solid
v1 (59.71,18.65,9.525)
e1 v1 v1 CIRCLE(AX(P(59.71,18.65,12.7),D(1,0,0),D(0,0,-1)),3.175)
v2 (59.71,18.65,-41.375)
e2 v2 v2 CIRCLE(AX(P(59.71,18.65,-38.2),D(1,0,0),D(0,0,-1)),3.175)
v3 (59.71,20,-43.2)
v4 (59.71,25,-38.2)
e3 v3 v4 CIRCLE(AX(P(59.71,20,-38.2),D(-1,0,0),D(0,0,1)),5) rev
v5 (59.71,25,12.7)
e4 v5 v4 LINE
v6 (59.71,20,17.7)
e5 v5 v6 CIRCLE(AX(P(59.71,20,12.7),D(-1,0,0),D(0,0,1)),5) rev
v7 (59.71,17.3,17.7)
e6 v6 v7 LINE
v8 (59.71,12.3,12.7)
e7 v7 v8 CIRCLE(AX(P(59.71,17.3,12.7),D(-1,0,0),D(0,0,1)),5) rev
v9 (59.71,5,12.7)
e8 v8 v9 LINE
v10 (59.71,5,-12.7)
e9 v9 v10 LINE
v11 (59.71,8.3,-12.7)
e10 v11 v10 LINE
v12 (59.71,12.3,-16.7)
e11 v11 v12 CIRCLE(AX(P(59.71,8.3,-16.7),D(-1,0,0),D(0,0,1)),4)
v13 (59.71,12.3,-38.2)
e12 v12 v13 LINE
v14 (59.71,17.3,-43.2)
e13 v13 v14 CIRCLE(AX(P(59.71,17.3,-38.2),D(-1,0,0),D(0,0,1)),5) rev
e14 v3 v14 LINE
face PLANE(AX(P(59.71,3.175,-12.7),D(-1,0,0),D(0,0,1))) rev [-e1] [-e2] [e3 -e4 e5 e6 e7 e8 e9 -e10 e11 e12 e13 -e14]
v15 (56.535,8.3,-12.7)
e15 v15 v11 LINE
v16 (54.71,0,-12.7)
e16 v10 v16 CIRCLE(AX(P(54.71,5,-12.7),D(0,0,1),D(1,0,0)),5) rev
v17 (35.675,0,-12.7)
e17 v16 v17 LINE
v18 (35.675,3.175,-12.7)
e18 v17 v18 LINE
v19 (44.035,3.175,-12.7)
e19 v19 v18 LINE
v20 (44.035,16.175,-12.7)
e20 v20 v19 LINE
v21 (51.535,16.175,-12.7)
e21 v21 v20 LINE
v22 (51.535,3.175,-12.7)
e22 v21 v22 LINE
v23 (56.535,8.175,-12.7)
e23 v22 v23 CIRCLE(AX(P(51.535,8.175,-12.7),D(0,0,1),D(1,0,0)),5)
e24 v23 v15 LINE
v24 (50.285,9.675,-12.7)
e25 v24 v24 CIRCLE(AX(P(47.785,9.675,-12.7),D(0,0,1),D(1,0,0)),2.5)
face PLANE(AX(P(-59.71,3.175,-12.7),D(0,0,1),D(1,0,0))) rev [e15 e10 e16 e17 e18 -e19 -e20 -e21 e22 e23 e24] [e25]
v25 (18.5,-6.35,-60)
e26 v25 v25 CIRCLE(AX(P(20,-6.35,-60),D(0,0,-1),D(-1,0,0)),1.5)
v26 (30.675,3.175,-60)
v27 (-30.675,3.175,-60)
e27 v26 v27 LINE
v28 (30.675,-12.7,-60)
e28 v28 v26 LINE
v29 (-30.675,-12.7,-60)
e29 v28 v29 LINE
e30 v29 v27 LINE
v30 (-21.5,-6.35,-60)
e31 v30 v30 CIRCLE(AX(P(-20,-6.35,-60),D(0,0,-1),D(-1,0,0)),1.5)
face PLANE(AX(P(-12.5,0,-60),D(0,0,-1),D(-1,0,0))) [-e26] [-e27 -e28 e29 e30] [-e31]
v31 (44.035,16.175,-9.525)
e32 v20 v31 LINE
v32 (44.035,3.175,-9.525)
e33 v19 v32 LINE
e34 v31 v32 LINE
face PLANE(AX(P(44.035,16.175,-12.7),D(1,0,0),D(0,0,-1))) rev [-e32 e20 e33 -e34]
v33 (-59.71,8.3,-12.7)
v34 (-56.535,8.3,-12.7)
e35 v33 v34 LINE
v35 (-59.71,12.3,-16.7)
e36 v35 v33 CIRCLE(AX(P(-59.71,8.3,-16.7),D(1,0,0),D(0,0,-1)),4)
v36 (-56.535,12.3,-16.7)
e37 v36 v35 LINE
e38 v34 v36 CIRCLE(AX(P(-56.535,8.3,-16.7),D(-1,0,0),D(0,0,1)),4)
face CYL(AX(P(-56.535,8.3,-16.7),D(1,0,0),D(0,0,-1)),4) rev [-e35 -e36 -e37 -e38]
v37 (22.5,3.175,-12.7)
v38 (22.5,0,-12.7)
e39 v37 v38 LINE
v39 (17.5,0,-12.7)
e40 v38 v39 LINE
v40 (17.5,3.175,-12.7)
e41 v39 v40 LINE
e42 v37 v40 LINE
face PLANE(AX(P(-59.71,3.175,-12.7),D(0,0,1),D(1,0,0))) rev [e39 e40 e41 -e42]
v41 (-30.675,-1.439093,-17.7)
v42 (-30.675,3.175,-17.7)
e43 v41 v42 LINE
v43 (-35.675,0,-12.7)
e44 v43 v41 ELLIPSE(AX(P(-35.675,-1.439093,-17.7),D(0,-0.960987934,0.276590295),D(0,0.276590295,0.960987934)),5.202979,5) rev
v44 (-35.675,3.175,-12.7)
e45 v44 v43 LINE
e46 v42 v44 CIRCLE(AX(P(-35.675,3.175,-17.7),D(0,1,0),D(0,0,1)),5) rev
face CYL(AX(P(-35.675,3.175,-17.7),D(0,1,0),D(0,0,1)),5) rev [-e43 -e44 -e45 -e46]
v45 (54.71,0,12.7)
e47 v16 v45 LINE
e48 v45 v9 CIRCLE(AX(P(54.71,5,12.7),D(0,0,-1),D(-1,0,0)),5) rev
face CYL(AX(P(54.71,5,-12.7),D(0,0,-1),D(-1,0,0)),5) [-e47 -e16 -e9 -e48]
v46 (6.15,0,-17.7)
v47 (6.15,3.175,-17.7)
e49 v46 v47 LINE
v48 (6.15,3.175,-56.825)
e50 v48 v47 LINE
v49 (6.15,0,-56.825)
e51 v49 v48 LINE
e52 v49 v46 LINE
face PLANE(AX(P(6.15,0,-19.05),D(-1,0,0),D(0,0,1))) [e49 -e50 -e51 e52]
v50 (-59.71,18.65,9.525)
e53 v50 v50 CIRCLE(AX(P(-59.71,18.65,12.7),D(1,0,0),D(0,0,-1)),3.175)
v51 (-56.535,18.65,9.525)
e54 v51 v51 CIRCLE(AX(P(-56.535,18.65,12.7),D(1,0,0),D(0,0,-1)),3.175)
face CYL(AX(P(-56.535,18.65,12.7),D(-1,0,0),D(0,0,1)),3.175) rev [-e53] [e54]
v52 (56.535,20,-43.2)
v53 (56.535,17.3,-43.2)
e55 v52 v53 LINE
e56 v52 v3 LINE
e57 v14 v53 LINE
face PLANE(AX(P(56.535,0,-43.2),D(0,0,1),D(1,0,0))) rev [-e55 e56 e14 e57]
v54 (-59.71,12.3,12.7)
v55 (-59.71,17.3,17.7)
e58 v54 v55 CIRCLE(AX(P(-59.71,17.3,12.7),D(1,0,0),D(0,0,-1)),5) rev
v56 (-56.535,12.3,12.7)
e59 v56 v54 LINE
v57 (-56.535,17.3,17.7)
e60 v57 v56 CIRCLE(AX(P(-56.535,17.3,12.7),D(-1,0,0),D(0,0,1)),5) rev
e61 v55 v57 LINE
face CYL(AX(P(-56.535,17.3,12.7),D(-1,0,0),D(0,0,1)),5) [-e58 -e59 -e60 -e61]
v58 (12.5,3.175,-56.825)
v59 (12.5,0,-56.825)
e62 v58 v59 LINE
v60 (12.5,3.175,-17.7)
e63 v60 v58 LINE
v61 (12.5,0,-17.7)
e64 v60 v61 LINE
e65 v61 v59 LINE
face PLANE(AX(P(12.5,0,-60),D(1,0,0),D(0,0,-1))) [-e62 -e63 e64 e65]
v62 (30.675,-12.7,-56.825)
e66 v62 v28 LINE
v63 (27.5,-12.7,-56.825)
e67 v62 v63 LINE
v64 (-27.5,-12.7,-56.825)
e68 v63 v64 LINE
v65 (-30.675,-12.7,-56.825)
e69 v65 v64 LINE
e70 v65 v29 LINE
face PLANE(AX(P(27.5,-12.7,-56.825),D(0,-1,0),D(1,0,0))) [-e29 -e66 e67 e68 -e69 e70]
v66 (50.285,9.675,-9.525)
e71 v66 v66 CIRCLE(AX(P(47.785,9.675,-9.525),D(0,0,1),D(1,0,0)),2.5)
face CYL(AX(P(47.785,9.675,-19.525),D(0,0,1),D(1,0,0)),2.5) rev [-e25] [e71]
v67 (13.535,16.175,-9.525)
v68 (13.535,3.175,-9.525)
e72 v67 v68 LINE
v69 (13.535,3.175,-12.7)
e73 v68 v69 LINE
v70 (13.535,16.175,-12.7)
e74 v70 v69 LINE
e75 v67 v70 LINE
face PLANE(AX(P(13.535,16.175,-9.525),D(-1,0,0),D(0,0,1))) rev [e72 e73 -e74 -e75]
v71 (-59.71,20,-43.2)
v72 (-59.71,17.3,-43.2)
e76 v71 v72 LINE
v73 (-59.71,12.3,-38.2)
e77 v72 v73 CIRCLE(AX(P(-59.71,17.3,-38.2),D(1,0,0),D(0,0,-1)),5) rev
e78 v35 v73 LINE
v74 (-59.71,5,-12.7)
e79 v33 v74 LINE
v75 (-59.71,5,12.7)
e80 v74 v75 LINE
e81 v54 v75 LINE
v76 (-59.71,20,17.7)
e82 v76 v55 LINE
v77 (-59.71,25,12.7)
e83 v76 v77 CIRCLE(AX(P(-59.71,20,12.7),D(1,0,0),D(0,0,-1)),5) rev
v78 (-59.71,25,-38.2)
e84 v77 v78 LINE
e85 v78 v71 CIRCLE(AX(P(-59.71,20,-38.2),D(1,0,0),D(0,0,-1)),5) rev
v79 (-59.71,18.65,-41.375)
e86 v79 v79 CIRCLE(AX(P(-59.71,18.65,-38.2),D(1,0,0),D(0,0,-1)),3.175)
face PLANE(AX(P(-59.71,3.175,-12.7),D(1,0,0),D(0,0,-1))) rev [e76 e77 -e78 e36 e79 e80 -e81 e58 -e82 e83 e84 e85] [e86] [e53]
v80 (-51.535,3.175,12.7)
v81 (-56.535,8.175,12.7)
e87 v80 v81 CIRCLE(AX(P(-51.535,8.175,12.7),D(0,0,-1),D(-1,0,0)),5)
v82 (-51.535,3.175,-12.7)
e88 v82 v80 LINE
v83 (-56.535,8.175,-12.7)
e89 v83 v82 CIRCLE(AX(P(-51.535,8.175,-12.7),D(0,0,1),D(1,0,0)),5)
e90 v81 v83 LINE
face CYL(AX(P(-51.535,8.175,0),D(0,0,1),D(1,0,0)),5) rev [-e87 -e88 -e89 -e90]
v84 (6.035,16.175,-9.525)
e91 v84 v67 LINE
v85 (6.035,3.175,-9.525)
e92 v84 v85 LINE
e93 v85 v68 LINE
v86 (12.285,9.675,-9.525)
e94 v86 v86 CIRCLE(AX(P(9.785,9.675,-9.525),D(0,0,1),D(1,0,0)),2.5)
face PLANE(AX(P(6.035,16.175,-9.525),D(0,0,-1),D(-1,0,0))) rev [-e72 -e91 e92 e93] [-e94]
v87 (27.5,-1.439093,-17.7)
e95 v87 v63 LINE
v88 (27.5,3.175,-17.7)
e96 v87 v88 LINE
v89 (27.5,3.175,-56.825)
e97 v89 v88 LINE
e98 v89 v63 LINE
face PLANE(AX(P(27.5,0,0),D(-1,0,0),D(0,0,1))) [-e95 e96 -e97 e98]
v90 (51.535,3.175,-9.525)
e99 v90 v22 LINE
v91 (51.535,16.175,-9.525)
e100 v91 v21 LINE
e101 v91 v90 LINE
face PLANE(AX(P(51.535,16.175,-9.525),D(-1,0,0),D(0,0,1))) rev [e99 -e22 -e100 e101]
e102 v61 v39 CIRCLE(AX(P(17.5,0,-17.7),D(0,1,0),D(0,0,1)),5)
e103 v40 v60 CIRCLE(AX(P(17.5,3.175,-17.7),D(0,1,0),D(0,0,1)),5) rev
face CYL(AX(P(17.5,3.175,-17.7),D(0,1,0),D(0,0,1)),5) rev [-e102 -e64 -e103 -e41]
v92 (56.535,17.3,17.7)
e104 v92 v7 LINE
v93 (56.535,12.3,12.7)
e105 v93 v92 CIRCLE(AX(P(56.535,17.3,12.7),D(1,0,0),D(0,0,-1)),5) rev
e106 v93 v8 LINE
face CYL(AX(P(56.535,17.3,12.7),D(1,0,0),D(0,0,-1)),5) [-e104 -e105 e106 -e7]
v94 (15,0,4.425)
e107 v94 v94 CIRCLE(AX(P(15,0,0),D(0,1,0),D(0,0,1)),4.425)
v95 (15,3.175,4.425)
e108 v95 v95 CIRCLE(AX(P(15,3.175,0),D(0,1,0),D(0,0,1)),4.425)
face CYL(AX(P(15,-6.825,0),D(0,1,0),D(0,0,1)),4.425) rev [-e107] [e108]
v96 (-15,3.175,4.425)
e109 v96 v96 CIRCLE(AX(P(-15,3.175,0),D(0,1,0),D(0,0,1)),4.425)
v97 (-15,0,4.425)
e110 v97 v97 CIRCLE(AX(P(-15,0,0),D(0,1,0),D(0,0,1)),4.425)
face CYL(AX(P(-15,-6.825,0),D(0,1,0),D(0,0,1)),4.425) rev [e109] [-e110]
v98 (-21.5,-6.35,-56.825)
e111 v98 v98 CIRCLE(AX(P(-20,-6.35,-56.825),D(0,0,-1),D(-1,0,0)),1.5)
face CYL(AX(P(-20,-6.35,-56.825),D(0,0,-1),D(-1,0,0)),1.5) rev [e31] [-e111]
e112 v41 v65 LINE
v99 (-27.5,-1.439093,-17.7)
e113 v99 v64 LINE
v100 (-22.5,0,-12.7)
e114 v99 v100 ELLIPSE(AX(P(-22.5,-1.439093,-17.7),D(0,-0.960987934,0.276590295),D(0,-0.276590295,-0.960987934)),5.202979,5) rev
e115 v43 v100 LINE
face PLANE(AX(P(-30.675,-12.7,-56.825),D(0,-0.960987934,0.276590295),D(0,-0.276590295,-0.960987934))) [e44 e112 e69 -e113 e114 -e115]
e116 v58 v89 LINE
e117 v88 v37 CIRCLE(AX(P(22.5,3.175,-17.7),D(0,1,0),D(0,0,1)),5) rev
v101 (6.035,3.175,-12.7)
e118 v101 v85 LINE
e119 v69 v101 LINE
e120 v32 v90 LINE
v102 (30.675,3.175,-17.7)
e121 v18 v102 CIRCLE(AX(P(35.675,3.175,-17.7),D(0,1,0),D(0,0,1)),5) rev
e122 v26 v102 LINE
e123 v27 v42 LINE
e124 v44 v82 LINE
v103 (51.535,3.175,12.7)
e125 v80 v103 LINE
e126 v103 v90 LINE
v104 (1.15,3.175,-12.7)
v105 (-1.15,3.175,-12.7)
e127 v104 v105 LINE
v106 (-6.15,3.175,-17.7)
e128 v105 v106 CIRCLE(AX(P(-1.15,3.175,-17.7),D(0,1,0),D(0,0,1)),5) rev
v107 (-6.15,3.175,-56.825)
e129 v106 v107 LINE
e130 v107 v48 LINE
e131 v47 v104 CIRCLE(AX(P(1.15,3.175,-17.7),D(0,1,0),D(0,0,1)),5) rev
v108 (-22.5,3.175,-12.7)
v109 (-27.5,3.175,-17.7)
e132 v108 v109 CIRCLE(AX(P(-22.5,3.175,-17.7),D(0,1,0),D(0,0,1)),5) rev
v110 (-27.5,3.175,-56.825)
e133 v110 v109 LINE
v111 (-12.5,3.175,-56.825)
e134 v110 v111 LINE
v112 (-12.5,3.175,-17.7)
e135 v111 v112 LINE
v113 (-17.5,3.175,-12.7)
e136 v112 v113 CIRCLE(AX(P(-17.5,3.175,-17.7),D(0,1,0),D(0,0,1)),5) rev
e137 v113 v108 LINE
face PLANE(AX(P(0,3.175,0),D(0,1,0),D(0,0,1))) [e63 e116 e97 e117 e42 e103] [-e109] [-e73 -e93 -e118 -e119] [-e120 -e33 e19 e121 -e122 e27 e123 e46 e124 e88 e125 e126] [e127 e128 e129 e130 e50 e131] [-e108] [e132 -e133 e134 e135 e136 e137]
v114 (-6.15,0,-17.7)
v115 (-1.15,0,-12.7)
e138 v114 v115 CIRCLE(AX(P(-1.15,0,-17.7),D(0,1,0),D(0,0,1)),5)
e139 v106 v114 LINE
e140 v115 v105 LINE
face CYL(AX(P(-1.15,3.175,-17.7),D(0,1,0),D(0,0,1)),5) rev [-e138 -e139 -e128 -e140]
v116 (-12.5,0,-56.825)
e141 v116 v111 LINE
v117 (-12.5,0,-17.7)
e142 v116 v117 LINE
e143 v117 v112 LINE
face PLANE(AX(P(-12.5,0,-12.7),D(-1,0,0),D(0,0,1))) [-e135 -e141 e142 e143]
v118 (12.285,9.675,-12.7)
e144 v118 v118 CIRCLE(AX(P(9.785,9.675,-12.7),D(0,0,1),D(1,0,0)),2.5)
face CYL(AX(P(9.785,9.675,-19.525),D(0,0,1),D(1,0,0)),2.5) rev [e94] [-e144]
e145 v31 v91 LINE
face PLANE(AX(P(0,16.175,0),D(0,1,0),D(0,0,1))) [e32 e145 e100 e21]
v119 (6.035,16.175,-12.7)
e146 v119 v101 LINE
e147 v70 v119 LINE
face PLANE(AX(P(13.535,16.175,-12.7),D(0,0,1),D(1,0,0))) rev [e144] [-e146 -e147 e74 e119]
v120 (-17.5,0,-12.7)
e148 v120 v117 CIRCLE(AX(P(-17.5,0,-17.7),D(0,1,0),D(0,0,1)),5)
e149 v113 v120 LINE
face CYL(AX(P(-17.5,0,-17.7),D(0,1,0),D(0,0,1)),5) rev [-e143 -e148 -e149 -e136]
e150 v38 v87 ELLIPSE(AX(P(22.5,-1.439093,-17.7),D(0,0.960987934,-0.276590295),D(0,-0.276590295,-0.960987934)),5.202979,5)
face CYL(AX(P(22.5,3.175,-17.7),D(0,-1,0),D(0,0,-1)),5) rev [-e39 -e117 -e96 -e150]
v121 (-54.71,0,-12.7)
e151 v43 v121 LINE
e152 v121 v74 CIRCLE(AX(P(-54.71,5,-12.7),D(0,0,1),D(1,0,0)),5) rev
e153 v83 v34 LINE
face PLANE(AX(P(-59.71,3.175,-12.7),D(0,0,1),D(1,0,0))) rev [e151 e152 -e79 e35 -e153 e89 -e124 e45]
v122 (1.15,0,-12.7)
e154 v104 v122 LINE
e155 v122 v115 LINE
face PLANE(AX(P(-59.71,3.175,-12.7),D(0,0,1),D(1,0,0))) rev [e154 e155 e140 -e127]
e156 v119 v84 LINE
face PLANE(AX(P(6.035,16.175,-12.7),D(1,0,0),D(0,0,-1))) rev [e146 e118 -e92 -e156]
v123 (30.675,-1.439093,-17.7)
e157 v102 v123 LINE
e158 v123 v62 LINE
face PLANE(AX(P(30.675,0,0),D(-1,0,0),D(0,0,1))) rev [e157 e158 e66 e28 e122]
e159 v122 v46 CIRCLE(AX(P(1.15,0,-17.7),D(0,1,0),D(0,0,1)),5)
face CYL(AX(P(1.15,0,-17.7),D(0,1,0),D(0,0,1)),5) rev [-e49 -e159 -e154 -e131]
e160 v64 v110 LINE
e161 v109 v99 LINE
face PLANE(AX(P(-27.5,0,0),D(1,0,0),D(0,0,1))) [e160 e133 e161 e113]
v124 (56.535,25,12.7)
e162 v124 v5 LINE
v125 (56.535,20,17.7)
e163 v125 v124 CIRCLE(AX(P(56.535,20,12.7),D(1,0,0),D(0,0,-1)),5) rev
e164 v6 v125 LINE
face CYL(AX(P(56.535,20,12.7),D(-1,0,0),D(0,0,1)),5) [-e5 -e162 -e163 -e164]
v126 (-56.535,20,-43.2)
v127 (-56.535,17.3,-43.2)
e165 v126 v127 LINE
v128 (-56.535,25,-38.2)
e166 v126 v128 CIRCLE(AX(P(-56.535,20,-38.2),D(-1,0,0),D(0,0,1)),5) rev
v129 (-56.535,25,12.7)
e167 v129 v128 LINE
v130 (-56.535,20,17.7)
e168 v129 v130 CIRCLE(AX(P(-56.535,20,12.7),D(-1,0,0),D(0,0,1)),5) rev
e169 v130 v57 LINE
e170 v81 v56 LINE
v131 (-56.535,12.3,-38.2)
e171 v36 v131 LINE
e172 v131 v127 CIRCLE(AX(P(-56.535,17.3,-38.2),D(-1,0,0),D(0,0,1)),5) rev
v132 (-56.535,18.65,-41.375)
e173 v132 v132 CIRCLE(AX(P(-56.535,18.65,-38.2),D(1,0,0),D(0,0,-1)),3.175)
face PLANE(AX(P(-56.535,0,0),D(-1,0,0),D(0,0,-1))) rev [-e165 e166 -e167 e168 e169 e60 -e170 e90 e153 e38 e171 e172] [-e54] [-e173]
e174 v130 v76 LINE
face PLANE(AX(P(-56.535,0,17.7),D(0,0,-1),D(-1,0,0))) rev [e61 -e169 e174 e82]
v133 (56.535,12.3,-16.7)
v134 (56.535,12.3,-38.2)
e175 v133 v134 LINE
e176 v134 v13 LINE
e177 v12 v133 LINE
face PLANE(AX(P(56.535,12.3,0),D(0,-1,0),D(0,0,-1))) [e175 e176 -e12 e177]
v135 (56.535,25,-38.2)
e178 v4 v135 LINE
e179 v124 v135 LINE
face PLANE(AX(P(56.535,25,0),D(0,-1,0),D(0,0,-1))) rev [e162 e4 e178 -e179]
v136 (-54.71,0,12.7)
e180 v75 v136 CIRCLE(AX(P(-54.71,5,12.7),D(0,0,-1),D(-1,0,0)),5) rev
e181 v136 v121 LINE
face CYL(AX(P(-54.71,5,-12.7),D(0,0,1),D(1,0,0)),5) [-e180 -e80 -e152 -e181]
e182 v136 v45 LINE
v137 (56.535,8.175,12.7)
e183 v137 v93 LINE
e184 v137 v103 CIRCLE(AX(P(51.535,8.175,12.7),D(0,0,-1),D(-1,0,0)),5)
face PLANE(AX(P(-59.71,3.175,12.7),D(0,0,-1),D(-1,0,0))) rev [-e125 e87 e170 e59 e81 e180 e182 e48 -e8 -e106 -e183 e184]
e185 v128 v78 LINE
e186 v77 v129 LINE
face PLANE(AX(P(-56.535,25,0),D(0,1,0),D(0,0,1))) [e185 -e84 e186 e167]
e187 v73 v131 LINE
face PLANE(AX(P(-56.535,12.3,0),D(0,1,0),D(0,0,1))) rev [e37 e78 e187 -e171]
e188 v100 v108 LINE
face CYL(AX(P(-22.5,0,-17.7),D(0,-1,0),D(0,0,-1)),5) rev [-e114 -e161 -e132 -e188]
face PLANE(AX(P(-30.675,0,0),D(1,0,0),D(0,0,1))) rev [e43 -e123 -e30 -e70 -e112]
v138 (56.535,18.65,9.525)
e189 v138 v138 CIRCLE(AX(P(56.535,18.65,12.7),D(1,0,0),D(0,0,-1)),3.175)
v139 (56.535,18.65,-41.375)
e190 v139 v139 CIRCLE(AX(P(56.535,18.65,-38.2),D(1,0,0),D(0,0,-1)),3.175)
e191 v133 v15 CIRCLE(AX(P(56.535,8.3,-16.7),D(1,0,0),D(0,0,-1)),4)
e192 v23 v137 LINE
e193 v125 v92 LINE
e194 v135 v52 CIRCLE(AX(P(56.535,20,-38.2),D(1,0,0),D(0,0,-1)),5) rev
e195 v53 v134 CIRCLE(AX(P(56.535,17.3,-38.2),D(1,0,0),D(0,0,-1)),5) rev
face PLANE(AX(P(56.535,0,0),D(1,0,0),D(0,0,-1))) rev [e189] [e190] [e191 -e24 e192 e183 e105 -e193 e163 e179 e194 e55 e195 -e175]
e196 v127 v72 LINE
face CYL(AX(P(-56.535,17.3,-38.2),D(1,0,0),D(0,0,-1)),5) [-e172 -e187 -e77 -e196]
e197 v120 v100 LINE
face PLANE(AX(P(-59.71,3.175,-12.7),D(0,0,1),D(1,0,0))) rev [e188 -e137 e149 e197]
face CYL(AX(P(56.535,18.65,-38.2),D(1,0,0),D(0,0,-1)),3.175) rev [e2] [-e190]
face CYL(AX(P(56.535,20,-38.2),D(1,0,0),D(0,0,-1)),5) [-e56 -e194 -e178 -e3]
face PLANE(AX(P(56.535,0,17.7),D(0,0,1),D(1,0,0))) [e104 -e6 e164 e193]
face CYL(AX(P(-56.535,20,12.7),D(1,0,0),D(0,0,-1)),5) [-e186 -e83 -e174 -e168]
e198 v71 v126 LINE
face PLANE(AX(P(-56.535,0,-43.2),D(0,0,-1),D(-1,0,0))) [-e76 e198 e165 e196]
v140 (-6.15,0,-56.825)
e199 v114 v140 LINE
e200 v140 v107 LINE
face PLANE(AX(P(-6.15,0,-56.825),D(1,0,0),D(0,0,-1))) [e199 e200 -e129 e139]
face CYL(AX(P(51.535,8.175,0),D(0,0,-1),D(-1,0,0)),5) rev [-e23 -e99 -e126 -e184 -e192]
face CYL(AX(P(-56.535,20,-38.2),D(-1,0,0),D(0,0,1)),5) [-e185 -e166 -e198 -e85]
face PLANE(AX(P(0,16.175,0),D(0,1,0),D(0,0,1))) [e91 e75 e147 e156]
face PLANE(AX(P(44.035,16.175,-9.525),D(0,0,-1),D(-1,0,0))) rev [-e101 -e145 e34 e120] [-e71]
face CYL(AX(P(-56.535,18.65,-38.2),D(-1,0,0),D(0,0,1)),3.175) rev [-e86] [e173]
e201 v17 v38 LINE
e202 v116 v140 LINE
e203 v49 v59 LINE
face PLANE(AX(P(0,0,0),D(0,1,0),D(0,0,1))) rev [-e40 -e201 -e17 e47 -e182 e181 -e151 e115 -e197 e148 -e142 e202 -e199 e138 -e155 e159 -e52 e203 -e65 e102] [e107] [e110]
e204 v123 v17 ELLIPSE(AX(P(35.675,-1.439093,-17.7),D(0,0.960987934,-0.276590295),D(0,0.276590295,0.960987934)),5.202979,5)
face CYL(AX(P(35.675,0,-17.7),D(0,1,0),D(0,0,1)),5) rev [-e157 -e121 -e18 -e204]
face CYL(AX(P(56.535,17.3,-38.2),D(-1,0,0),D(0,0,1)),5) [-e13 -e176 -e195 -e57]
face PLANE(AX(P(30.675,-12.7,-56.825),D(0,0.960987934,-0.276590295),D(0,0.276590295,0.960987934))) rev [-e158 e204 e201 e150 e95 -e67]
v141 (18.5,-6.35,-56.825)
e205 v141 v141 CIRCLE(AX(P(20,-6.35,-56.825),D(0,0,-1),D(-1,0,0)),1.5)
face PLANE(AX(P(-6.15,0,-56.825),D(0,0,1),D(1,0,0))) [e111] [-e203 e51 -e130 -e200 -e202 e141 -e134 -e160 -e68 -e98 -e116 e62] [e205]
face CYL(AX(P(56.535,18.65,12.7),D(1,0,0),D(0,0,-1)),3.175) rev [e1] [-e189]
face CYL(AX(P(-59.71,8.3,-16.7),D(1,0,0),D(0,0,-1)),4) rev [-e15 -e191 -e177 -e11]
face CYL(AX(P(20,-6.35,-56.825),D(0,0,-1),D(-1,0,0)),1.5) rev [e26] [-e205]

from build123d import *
from OCP.BRepFilletAPI import BRepFilletAPI_MakeFillet

# Parameters (mm, degrees)
SKETCH1_W              = 119.42
SKETCH1_H              = 25.4
BOSS_EXTRUDE1_DEPTH    = 3.175
SKETCH2_R              = 3.175
SKETCH2_W              = 25.4
SKETCH2_H              = 3.175
BOSS_EXTRUDE3_DEPTH    = 3.175
FILLET2_R              = 5
FILLET2_R_2            = 4
FILLET2_OF_MIRROR3_R   = 5
FILLET2_OF_MIRROR3_R_2 = 4
FILLET3_R              = 5
SKETCH3_R              = 4.425
CUT_EXTRUDE1_DEPTH     = 10
BOSS_EXTRUDE4_DEPTH    = 3.175
SKETCH9_W              = 55
SKETCH9_H              = 15.875
SKETCH9_R              = 1.5
BOSS_EXTRUDE7_DEPTH    = 3.175
BOSS_EXTRUDE8_DEPTH    = 3.175
FILLET4_R              = 5
SKETCH11_W             = 7.5
SKETCH11_H             = 3.175
BOSS_EXTRUDE9_DEPTH    = 13
SKETCH12_R             = 2.5
CUT_EXTRUDE2_DEPTH     = 10


with BuildPart() as part:
    # Sketch1 → Boss-Extrude1 (new body)
    with BuildSketch(Plane(origin=(0, 0, 0), x_dir=(1, 0, 0), z_dir=(0, 1, 0))):
        Rectangle(SKETCH1_W, SKETCH1_H)
    extrude(amount=BOSS_EXTRUDE1_DEPTH)

    # Sketch2 → Boss-Extrude3 (add)
    # profile 1 of 2: a face of its own
    with BuildSketch(Plane(origin=(59.71, 0, 0), x_dir=(0, 0, -1), z_dir=(1, 0, 0))):
        Polygon((-12.7, 12.3), (-12.7, 3.175), (12.7, 3.175), (12.7, 12.3), (38.2, 12.3), (43.2, 12.3), (43.2, 25), (38.2, 25), (12.7, 25), (-12.7, 25), (-17.7, 25), (-17.7, 12.3), align=None)
        with Locations((-12.7, 18.65)):
            Circle(SKETCH2_R, mode=Mode.SUBTRACT)
        with Locations((38.2, 18.65)):
            Circle(SKETCH2_R, mode=Mode.SUBTRACT)
    # profile 2 of 2: a face of its own
    with BuildSketch(Plane(origin=(59.71, 0, 0), x_dir=(0, 0, -1), z_dir=(1, 0, 0))):
        with Locations((0, 1.5875)):
            Rectangle(SKETCH2_W, SKETCH2_H)
    boss_extrude3 = extrude(amount=-BOSS_EXTRUDE3_DEPTH)

    # Fillet2
    fillet2_edges_1 = [part.edges().sort_by_distance(p)[0] for p in [
        (58.1225, 25, -43.2),
        (58.1225, 12.3, -43.2),
        (58.1225, 12.3, 17.7),
        (58.1225, 25, 17.7),
    ]]
    fillet2_edges_2 = [part.edges().sort_by_distance(p)[0] for p in [
        (58.1225, 12.3, -12.7),
    ]]
    fillet2 = BRepFilletAPI_MakeFillet(part.part.solid().wrapped)
    for e in fillet2_edges_1:
        fillet2.Add(FILLET2_R - 0.0001, e.wrapped)
    for e in fillet2_edges_2:
        fillet2.Add(FILLET2_R_2 - 0.0001, e.wrapped)
    add(Compound.cast(fillet2.Shape()), mode=Mode.REPLACE)  # a hair under: the kernel refuses the full size

    # Mirror3: Boss-Extrude3 across plane
    add(boss_extrude3.mirror(Plane(origin=(0, 0, 0), x_dir=(0, 0, 1), z_dir=(1, 0, 0))))

    # Fillet2 of Mirror3
    fillet2_of_mirror3_edges_1 = [part.edges().sort_by_distance(p)[0] for p in [
        (-58.1225, 25, -43.2),
        (-58.1225, 12.3, -43.2),
        (-58.1225, 12.3, 17.7),
        (-58.1225, 25, 17.7),
    ]]
    fillet2_of_mirror3_edges_2 = [part.edges().sort_by_distance(p)[0] for p in [
        (-58.1225, 12.3, -12.7),
    ]]
    fillet2_of_mirror3 = BRepFilletAPI_MakeFillet(part.part.solid().wrapped)
    for e in fillet2_of_mirror3_edges_1:
        fillet2_of_mirror3.Add(FILLET2_OF_MIRROR3_R - 0.0001, e.wrapped)
    for e in fillet2_of_mirror3_edges_2:
        fillet2_of_mirror3.Add(FILLET2_OF_MIRROR3_R_2 - 0.0001, e.wrapped)
    add(Compound.cast(fillet2_of_mirror3.Shape()), mode=Mode.REPLACE)  # a hair under: the kernel refuses the full size

    # Fillet3
    fillet3_edges = [part.edges().sort_by_distance(p)[0] for p in [
        (56.535, 3.175, 0),
        (59.71, 0, 0),
        (-59.71, 0, 0),
        (-56.535, 3.175, 0),
    ]]
    fillet(fillet3_edges, radius=FILLET3_R)

    # Sketch3 → Cut-Extrude1 (cut)
    with BuildSketch(Plane(origin=(0, 3.175, 0), x_dir=(1, 0, 0), z_dir=(0, 1, 0))):
        with Locations(Location((-15, 0, 0), (0, 0, 270))):
            Circle(SKETCH3_R)
        with Locations(Location((15, 0, 0), (0, 0, 270))):
            Circle(SKETCH3_R)
    extrude(amount=-CUT_EXTRUDE1_DEPTH, mode=Mode.SUBTRACT)

    # Sketch4 → Boss-Extrude4 (add)
    with BuildSketch(Plane(origin=(0, 3.175, 0), x_dir=(1, 0, 0), z_dir=(0, 1, 0))):
        Polygon((-12.5, 60), (12.5, 60), (12.5, 12.7), (6.15, 12.7), (6.15, 19.05), (6.15, 56.825), (-6.15, 56.825), (-6.15, 22.225), (-6.15, 12.7), (-12.5, 12.7), align=None)
    extrude(amount=-BOSS_EXTRUDE4_DEPTH)

    # Sketch9 → Boss-Extrude7 (add)
    with BuildSketch(Plane(origin=(0, 0, -60), x_dir=(-1, 0, 0), z_dir=(0, 0, -1))):
        with Locations((0, -4.7625)):
            Rectangle(SKETCH9_W, SKETCH9_H)
        with Locations((-20, -6.35)):
            Circle(SKETCH9_R, mode=Mode.SUBTRACT)
        with Locations((20, -6.35)):
            Circle(SKETCH9_R, mode=Mode.SUBTRACT)
    extrude(amount=-BOSS_EXTRUDE7_DEPTH)

    # Sketch10 → Boss-Extrude8 (add)
    with BuildSketch(Plane(origin=(27.5, 0, 0), x_dir=(0, 0, -1), z_dir=(1, 0, 0))):
        Polygon((56.825, -12.7), (12.7, 0), (12.7, 3.175), (60, 3.175), (60, -12.7), align=None)
    boss_extrude8 = extrude(amount=BOSS_EXTRUDE8_DEPTH)

    # Mirror4: Boss-Extrude8 across plane
    add(boss_extrude8.mirror(Plane(origin=(0, 0, 0), x_dir=(0, 0, 1), z_dir=(1, 0, 0))))

    # Fillet4
    fillet4_edges = [part.edges().sort_by_distance(p)[0] for p in [
        (12.5, 1.5875, -12.7),
        (6.15, 1.5875, -12.7),
        (-6.15, 1.5875, -12.7),
        (-12.5, 1.5875, -12.7),
        (27.5, 1.5875, -12.7),
        (30.675, 1.5875, -12.7),
        (-30.675, 1.5875, -12.7),
        (-27.5, 1.5875, -12.7),
    ]]
    fillet(fillet4_edges, radius=FILLET4_R)

    # Sketch11 → Boss-Extrude9 (add)
    with BuildSketch(Plane(origin=(0, 3.175, 0), x_dir=(1, 0, 0), z_dir=(0, 1, 0))):
        with Locations((47.785, 11.1125)):
            Rectangle(SKETCH11_W, SKETCH11_H)
        with Locations((9.785, 11.1125)):
            Rectangle(SKETCH11_W, SKETCH11_H)
    extrude(amount=BOSS_EXTRUDE9_DEPTH)

    # Sketch12 → Cut-Extrude2 (cut)
    with BuildSketch(Plane.XY.offset(-9.525)):
        with Locations((9.785, 9.675)):
            Circle(SKETCH12_R)
        with Locations((47.785, 9.675)):
            Circle(SKETCH12_R)
    extrude(amount=-CUT_EXTRUDE2_DEPTH, mode=Mode.SUBTRACT)


solid = part.part
